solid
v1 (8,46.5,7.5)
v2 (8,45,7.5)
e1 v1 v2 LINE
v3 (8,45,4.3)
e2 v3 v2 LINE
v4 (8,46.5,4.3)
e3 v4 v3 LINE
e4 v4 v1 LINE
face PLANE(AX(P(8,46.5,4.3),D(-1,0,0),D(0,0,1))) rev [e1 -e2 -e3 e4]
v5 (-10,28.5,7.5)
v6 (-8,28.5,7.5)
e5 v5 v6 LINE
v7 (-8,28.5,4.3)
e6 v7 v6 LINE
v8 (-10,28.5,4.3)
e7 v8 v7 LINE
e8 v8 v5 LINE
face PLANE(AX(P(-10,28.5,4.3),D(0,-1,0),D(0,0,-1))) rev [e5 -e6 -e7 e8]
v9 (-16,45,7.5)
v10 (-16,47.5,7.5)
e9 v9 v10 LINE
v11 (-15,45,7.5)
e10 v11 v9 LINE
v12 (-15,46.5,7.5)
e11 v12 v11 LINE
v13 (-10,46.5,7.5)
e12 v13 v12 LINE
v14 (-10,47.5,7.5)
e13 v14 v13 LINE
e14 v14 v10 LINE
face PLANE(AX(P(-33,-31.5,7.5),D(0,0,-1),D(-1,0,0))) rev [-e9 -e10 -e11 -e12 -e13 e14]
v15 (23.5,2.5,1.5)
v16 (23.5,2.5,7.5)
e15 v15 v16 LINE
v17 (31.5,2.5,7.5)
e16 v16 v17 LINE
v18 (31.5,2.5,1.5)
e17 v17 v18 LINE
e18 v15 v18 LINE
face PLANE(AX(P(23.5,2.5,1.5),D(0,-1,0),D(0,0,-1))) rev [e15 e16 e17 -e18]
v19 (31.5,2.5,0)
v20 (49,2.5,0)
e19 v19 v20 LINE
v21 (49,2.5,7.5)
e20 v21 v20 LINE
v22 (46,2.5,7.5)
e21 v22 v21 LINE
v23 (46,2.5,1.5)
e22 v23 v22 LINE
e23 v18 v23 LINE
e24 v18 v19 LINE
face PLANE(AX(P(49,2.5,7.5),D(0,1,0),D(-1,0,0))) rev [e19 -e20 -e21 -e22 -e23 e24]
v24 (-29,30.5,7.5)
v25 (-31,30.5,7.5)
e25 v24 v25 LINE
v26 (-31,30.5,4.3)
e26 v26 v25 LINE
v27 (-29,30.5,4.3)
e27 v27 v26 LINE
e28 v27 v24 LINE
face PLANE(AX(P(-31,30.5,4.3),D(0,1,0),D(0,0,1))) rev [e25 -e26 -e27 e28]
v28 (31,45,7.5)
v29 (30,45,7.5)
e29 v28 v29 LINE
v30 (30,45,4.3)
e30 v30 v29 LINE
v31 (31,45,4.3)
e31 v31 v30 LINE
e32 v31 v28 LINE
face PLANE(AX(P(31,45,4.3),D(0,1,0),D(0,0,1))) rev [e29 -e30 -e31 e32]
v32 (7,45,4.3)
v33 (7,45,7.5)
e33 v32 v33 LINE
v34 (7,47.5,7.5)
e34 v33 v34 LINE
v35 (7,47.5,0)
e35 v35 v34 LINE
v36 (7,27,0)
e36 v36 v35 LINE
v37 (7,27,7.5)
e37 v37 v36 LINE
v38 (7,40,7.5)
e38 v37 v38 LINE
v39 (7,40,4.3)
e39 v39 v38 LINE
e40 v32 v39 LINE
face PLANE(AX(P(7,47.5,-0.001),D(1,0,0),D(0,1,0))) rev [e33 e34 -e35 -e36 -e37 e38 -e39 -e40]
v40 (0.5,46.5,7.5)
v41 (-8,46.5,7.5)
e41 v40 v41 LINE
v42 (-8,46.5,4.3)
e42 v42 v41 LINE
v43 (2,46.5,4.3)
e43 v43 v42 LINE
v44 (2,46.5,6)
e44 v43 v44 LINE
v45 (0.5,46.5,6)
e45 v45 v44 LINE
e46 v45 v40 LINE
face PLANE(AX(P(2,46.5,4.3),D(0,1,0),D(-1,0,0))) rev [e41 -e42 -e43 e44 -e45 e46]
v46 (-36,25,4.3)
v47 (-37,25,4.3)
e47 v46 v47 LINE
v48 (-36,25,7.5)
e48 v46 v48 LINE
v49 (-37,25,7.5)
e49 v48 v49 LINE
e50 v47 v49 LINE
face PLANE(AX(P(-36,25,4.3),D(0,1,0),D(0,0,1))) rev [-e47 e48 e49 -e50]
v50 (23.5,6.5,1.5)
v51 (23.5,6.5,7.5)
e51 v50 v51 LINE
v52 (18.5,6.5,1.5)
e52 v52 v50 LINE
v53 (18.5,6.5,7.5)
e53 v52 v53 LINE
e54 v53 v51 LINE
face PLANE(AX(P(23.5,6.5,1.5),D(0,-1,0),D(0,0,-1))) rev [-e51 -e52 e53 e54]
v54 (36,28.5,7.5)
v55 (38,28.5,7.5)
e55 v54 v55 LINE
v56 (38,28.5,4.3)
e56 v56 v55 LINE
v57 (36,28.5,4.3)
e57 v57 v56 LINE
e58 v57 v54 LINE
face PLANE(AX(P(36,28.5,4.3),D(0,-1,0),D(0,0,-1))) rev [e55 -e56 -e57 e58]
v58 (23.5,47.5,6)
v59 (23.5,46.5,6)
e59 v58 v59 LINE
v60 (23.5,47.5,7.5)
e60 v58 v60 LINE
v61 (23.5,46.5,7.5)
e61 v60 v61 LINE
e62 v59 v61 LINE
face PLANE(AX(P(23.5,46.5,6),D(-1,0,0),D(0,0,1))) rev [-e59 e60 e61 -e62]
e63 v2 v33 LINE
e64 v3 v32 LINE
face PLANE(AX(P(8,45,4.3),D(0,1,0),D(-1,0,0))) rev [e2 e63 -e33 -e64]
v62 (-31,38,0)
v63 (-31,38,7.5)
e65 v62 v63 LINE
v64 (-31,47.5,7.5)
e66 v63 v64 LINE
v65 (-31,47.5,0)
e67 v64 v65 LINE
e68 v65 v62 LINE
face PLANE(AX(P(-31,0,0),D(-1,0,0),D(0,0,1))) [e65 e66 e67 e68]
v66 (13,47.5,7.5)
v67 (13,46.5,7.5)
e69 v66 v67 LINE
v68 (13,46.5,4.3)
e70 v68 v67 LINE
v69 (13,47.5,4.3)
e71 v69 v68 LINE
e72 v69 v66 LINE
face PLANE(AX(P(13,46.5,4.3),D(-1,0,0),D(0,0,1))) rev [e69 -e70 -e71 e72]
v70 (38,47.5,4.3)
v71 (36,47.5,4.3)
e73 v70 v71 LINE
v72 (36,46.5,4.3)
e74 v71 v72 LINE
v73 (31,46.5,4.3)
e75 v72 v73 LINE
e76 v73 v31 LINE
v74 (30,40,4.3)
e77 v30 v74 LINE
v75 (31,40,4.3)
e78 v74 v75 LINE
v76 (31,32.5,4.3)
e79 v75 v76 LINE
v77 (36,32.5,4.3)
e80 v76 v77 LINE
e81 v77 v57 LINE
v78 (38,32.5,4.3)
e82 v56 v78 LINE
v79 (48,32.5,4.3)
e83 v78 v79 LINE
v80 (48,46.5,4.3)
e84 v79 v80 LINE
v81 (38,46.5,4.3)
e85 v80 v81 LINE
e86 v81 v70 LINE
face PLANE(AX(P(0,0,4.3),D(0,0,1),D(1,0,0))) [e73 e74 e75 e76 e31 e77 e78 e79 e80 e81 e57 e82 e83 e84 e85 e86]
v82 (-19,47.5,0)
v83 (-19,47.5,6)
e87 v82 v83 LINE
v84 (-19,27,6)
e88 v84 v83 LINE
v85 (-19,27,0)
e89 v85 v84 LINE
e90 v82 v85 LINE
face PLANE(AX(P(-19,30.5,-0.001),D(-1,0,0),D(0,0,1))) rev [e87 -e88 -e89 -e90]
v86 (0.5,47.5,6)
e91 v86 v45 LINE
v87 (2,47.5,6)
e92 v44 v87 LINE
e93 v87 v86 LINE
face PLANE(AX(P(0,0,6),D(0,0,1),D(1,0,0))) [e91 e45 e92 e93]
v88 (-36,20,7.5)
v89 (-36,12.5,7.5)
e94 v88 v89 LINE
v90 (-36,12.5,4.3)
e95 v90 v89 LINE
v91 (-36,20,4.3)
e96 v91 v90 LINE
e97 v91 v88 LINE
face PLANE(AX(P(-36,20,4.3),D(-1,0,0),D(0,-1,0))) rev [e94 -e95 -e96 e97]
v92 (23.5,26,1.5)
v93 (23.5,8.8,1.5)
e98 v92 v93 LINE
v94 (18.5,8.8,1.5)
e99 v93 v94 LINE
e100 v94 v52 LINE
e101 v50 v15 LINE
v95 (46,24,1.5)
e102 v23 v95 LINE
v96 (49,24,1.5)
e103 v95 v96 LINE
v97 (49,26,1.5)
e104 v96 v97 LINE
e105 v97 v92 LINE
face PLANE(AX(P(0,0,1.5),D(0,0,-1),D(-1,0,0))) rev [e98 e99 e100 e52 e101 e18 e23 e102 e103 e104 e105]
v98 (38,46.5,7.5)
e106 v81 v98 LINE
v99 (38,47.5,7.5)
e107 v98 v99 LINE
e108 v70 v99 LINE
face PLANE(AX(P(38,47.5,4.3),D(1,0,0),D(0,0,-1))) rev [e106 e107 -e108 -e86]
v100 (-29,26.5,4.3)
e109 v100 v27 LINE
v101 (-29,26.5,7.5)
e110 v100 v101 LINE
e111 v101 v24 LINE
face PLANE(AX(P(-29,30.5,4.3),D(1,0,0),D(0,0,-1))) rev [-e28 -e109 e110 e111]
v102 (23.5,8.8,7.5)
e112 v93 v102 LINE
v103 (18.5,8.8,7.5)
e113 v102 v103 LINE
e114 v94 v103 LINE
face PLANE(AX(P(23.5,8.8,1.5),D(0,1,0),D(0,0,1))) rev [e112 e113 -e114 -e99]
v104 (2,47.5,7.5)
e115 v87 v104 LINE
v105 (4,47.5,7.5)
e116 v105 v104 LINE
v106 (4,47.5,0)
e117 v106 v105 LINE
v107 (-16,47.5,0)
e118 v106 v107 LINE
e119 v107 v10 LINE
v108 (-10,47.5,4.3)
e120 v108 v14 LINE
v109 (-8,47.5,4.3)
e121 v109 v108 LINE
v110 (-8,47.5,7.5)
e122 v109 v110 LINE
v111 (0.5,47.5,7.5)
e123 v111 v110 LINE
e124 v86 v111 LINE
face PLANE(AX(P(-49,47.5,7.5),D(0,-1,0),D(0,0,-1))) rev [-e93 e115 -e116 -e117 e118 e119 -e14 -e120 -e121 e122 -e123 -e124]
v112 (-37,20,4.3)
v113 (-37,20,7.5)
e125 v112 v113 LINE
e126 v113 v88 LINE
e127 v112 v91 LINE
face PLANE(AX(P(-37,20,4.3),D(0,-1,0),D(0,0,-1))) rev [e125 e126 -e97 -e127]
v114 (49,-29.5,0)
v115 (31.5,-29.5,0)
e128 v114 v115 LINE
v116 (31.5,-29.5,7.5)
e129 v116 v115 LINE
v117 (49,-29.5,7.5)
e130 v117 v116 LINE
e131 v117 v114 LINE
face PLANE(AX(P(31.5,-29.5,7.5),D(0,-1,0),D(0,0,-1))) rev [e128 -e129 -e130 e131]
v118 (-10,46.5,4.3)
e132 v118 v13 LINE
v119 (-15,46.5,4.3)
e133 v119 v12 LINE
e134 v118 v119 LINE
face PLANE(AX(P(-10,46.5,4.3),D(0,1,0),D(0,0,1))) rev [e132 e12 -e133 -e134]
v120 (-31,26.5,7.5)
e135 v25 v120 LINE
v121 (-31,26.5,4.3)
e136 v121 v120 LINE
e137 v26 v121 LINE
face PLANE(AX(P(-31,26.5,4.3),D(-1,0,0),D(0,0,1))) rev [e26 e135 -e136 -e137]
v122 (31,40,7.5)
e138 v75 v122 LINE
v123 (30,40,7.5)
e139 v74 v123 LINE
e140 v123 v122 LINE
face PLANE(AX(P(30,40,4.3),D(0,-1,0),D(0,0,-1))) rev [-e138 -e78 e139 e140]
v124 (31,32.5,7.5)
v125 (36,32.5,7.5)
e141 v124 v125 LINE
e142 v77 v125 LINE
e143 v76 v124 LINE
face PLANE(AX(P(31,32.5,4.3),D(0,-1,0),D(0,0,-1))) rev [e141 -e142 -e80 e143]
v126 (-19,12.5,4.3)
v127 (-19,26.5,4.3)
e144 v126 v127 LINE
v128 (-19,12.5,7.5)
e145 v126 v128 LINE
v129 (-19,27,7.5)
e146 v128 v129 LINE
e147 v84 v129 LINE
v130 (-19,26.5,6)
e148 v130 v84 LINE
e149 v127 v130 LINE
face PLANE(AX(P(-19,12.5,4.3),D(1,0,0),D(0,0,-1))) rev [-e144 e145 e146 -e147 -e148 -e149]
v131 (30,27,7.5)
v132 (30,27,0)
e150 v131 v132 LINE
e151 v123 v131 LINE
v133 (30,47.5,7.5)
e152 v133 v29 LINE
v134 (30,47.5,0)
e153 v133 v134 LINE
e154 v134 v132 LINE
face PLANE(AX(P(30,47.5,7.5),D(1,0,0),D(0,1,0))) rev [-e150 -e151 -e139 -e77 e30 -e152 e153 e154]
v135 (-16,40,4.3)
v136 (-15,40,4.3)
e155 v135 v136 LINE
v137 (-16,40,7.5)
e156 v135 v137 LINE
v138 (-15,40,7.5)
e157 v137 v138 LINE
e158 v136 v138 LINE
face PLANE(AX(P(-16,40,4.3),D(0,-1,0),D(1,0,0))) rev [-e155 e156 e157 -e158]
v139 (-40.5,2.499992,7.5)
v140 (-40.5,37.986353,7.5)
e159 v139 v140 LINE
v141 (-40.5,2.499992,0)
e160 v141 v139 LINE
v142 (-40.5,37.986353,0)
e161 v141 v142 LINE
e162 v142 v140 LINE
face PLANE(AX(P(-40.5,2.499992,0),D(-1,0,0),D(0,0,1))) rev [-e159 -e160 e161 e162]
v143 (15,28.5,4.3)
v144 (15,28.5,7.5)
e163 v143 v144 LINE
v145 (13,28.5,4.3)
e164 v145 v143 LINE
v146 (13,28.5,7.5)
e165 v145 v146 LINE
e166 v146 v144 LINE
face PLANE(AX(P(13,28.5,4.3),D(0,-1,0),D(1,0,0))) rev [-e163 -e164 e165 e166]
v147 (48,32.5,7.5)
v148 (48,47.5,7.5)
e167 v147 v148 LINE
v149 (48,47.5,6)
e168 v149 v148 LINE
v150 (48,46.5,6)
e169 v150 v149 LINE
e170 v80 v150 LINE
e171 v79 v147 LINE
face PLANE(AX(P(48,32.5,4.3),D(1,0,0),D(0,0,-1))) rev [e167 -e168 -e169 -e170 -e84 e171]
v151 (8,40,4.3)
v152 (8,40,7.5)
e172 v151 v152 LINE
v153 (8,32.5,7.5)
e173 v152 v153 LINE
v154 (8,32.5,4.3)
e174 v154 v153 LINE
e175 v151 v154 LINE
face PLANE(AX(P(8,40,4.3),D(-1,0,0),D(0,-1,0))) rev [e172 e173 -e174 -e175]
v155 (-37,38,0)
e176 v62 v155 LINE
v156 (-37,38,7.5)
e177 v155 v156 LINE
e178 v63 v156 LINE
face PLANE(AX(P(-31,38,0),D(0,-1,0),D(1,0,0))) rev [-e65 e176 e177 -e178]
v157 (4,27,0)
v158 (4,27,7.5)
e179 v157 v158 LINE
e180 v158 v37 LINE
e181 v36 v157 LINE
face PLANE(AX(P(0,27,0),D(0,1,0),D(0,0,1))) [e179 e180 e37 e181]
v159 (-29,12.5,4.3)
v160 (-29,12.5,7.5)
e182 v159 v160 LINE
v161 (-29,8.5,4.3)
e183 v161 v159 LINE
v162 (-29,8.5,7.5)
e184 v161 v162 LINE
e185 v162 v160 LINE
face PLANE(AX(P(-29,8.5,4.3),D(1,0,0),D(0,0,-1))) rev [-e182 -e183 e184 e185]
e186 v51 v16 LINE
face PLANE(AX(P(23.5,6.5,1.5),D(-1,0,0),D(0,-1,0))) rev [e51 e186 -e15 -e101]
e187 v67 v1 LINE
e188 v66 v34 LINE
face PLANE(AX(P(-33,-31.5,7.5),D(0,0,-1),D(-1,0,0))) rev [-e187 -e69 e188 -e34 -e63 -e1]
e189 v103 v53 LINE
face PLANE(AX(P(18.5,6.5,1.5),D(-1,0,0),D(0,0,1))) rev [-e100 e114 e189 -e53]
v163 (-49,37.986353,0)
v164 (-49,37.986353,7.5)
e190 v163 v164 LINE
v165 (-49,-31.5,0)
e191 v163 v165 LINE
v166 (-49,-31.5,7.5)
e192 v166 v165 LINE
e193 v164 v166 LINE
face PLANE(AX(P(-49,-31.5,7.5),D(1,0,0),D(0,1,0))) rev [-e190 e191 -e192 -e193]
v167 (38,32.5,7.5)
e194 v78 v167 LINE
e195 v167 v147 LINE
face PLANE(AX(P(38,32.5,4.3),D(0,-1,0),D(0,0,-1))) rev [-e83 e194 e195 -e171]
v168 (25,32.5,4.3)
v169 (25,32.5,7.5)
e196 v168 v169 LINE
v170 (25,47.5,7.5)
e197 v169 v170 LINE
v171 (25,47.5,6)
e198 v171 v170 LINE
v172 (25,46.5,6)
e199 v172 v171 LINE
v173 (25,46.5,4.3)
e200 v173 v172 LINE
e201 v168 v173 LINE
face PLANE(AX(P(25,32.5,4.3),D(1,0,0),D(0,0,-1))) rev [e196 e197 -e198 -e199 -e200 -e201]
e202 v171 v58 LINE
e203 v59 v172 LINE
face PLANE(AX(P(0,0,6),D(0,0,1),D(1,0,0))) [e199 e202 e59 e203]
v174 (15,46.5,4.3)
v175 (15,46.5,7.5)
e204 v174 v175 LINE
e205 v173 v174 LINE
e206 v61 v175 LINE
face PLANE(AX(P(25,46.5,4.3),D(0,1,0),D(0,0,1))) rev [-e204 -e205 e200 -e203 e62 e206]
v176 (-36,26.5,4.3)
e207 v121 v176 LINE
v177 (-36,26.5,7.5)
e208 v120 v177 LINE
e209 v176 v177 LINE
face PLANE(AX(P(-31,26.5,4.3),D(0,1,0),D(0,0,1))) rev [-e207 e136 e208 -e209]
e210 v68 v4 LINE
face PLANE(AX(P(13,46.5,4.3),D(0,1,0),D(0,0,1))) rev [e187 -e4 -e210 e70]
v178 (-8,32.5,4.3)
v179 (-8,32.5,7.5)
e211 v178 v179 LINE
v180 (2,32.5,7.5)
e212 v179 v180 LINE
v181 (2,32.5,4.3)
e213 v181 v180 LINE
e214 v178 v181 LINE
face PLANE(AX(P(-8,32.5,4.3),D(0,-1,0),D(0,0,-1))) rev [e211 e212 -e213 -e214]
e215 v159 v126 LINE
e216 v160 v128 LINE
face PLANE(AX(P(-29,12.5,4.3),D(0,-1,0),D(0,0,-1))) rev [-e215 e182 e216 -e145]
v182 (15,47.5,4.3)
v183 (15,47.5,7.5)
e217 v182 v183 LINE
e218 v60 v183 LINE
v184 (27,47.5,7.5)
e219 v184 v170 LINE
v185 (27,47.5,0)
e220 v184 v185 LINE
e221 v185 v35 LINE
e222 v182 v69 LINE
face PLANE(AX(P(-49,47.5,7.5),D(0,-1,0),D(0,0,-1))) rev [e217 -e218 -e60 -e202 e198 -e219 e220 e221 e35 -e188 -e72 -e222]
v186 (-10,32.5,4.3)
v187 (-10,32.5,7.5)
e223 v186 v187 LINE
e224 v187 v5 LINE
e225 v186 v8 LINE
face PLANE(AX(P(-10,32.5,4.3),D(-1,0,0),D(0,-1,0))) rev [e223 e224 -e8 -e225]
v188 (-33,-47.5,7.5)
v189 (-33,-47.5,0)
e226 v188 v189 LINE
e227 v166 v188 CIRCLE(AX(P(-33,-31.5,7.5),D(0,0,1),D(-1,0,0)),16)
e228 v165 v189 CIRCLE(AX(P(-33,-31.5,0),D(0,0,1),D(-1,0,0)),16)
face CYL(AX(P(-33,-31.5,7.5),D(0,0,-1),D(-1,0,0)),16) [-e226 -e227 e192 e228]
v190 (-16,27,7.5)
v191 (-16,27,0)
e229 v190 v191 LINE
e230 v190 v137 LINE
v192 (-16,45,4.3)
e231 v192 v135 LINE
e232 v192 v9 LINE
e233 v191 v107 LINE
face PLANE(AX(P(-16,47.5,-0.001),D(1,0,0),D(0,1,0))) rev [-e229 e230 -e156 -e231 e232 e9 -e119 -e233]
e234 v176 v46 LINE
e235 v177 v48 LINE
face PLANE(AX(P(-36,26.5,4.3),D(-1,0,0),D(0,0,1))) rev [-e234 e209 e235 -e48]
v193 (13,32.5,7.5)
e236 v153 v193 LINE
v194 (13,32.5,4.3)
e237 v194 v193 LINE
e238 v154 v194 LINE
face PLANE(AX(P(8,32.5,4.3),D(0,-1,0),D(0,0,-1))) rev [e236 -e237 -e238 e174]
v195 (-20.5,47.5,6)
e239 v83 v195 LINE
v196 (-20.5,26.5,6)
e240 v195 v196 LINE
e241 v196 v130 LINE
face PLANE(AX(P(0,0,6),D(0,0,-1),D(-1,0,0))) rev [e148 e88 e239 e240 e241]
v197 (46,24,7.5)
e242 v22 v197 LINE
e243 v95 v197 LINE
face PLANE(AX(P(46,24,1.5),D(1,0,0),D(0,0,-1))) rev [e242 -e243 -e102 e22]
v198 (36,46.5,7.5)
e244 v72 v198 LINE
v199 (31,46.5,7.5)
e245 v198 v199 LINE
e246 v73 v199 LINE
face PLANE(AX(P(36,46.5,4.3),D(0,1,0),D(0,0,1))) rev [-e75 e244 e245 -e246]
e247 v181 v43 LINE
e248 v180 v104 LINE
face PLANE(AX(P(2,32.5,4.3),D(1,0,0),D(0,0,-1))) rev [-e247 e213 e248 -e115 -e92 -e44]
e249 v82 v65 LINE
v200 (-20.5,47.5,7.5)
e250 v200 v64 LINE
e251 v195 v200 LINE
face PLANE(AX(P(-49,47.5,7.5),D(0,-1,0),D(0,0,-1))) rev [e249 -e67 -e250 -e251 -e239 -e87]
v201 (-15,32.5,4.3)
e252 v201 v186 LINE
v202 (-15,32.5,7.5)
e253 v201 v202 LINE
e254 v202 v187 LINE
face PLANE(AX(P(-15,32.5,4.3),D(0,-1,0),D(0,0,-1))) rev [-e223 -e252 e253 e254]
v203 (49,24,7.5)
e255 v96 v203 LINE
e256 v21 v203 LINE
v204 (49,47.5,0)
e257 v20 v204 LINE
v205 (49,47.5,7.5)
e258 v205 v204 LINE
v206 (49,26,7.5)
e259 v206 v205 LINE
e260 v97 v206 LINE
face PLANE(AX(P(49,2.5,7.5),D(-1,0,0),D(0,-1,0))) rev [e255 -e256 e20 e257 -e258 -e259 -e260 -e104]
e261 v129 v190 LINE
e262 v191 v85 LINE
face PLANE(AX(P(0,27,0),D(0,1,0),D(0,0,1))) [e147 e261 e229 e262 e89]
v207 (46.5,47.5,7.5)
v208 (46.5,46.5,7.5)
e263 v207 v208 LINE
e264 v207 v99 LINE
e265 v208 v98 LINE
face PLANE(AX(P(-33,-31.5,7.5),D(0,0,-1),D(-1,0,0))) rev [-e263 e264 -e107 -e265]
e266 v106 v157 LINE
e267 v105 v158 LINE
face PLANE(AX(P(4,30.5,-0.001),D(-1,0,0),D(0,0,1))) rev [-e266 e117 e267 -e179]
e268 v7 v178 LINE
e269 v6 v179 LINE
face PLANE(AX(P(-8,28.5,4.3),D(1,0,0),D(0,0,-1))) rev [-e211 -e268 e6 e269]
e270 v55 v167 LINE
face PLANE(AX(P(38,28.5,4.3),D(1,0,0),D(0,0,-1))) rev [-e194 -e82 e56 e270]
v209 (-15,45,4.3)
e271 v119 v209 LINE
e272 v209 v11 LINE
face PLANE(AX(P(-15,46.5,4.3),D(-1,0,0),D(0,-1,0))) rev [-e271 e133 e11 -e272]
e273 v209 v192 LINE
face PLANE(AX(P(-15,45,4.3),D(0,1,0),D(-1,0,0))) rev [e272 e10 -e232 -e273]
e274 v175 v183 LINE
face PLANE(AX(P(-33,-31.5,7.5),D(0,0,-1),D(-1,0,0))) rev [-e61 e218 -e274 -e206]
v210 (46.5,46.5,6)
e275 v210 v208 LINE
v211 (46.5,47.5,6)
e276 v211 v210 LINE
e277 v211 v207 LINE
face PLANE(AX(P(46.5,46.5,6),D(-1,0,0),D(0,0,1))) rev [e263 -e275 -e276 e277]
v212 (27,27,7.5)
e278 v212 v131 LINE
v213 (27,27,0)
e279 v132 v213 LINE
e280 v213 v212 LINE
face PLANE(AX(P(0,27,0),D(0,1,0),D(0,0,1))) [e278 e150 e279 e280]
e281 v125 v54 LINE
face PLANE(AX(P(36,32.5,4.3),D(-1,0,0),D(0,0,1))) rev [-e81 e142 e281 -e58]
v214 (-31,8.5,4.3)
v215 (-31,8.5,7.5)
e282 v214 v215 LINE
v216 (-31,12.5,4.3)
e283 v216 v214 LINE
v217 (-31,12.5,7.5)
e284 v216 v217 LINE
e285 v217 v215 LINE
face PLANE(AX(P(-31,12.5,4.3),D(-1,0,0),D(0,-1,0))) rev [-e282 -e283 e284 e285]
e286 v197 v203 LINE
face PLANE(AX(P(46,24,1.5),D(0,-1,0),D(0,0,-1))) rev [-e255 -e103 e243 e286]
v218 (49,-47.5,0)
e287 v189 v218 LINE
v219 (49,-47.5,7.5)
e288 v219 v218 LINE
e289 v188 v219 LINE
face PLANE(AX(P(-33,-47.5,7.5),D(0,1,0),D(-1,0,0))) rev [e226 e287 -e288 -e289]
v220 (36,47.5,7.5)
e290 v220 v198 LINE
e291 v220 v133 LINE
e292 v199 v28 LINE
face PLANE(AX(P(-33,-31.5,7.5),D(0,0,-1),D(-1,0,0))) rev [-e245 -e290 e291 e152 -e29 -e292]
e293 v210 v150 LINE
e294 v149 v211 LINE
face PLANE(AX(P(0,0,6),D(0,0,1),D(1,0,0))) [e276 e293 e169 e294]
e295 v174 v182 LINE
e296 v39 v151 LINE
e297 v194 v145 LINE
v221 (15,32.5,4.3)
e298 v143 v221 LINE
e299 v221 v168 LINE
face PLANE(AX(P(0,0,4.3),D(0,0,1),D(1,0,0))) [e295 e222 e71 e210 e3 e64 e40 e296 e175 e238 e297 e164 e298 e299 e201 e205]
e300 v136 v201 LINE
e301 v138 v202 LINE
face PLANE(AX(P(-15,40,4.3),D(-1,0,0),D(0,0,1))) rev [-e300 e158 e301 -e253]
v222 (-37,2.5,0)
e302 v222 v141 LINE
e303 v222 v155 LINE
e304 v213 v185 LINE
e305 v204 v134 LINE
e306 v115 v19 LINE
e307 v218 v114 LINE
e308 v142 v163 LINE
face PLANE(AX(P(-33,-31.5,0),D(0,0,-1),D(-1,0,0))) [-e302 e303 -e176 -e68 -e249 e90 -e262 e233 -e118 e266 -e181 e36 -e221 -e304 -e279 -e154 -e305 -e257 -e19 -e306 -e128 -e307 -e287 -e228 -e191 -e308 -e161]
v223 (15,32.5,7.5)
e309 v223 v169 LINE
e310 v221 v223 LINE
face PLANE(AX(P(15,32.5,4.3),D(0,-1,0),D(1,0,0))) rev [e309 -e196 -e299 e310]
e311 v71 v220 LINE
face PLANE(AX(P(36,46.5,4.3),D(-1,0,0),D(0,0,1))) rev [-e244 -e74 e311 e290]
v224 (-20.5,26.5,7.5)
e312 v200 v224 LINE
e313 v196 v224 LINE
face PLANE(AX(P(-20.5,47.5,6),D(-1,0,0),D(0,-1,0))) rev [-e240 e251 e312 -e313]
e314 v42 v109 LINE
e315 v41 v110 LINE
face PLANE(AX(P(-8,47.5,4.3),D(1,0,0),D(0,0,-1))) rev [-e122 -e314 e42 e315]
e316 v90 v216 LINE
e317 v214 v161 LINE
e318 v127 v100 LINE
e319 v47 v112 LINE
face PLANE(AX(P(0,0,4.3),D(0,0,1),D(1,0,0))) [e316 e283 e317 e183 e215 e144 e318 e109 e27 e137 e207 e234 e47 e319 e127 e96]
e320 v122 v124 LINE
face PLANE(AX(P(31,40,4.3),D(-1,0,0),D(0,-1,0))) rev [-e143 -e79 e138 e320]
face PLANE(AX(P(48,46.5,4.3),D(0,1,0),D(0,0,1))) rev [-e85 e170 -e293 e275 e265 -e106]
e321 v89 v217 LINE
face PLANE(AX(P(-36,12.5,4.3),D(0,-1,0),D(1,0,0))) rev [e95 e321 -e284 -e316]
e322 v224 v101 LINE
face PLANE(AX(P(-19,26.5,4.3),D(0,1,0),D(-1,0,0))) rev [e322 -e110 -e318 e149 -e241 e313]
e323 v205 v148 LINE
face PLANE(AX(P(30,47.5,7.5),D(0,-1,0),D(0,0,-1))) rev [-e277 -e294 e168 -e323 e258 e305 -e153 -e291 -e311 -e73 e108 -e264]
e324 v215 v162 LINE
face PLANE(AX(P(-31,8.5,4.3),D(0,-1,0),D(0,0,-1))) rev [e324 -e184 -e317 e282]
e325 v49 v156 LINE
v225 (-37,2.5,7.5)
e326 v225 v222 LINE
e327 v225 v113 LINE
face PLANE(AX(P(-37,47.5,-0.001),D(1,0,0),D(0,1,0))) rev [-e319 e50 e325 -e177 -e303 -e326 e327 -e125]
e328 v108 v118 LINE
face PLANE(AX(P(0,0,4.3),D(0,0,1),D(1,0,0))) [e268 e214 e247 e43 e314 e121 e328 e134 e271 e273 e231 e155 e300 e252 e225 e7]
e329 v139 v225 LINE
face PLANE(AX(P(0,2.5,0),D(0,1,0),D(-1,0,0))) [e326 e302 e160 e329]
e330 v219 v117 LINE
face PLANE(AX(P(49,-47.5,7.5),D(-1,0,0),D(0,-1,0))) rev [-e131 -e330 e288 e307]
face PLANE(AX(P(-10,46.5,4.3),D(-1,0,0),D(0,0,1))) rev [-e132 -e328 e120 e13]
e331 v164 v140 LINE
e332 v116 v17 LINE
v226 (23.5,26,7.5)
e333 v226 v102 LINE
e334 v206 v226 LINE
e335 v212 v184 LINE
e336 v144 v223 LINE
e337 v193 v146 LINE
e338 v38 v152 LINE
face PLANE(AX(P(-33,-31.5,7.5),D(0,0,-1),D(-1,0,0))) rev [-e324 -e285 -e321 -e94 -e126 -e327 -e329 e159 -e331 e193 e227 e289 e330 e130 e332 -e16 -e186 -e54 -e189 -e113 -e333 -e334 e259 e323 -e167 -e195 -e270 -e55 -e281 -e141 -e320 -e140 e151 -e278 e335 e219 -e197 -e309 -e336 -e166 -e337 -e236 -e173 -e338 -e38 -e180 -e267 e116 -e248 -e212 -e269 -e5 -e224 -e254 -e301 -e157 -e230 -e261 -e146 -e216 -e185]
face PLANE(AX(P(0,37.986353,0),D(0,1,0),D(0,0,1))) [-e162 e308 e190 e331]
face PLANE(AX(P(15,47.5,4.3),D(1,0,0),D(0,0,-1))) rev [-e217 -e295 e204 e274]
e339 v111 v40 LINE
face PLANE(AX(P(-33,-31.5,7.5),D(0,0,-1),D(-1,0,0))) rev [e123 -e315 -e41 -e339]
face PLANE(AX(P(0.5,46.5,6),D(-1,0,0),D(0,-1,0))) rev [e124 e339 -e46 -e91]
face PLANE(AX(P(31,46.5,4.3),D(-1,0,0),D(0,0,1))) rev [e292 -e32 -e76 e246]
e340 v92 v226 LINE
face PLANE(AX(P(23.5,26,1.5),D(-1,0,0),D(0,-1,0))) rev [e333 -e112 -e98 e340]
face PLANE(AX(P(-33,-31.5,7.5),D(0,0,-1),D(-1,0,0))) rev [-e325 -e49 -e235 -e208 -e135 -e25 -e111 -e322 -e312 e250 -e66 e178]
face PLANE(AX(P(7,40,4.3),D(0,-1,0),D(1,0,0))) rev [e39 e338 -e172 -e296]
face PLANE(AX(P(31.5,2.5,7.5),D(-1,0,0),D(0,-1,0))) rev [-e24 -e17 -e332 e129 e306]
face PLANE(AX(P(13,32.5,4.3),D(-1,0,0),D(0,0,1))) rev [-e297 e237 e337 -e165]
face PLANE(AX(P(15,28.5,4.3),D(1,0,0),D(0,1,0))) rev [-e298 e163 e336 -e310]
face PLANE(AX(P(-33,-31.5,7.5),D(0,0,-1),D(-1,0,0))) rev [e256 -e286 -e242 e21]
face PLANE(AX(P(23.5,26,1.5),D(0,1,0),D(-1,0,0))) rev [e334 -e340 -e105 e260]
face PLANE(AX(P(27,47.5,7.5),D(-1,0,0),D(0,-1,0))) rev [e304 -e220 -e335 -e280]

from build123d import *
from OCP.BRepAlgoAPI import BRepAlgoAPI_Cut
from OCP.TopTools import TopTools_ListOfShape
from build123d.topology import SkipClean

# Parameters (mm, degrees)
BOSS_EXTRUDE1_DEPTH = 7.5
CUT_EXTRUDE1_DEPTH  = 3.2
CUT_EXTRUDE4_REACH  = 70.655
SKETCH5_W           = 3
SKETCH5_H           = 17
CUT_EXTRUDE5_REACH  = 70.655
SKETCH8_W           = 12
SKETCH8_H           = 37
CUT_EXTRUDE6_DEPTH  = 3.2
SKETCH10_W          = 10
SKETCH10_H          = 7.5
BOSS_EXTRUDE2_DEPTH = 27.486353186
SKETCH11_W          = 3
SKETCH11_H          = 7.5
CUT_EXTRUDE7_DEPTH  = 3.5
SKETCH12_W          = 2
SKETCH12_H          = 7.5
CUT_EXTRUDE8_DEPTH  = 4
SKETCH13_W          = 2
SKETCH13_H          = 7.5
CUT_EXTRUDE9_DEPTH  = 4
SKETCH14_W          = 7.5
SKETCH14_H          = 9.5
CUT_EXTRUDE10_DEPTH = 6
SKETCH15_W          = 1.5
SKETCH15_H          = 21
SKETCH15_H_2        = 1
CUT_EXTRUDE11_DEPTH = 1.5
SKETCH16_W          = 1.5
SKETCH16_H          = 7.5
CUT_EXTRUDE12_DEPTH = 35.486360958
CUT_EXTRUDE13_DEPTH = 6


with BuildPart() as part:
    # Sketch1 → Boss-Extrude1 (new body)
    with BuildSketch(Plane.XY):
        with BuildLine():
            Line((-33, -47.5), (49, -47.5))
            Line((49, -47.5), (49, -29.5))
            Line((49, -29.5), (31.5, -29.5))
            Line((31.5, -29.5), (31.5, 2.5))
            Line((31.5, 2.5), (49, 2.5))
            Line((49, 2.5), (49, 47.5))
            Line((49, 47.5), (30, 47.5))
            Line((30, 47.5), (30, 30.5))
            Line((30, 30.5), (27, 30.5))
            Line((27, 30.5), (27, 47.5))
            Line((27, 47.5), (-49, 47.5))
            Line((-49, 47.5), (-49, -31.5))
            ThreePointArc((-49, -31.5), (-44.313708499, -42.813708499), (-33, -47.5))
        make_face()
    extrude(amount=BOSS_EXTRUDE1_DEPTH)

    # Sketch2 → Cut-Extrude1 (cut)
    with BuildSketch(Plane.XY.offset(7.5)):
        Polygon((30, 40), (31, 40), (31, 32.5), (36, 32.5), (36, 28.5), (38, 28.5), (38, 32.5), (48, 32.5), (48, 46.5), (38, 46.5), (38, 47.5), (36, 47.5), (36, 46.5), (31, 46.5), (31, 45), (30, 45), align=None)
        Polygon((-16, 40), (-15, 40), (-15, 32.5), (-10, 32.5), (-10, 28.5), (-8, 28.5), (-8, 32.5), (2, 32.5), (2, 46.5), (-8, 46.5), (-8, 47.5), (-10, 47.5), (-10, 46.5), (-15, 46.5), (-15, 45), (-16, 45), align=None)
        Polygon((7, 40), (8, 40), (8, 32.5), (13, 32.5), (13, 28.5), (15, 28.5), (15, 32.5), (25, 32.5), (25, 46.5), (15, 46.5), (15, 47.5), (13, 47.5), (13, 46.5), (8, 46.5), (8, 45), (7, 45), align=None)
    extrude(amount=-CUT_EXTRUDE1_DEPTH, mode=Mode.SUBTRACT)

    # Sketch5 → Cut-Extrude4 (cut, up to next)
    with BuildSketch(Plane.XY.offset(7.5), mode=Mode.PRIVATE) as cut_extrude4_sk1:
        with Locations((5.5, 39)):
            Rectangle(SKETCH5_W, SKETCH5_H)
    cut_extrude4_tool1 = extrude(cut_extrude4_sk1.sketch, amount=-CUT_EXTRUDE4_REACH, mode=Mode.PRIVATE) & part.part
    # Sketch5 → Cut-Extrude4 (cut, up to next)
    with BuildSketch(Plane.XY.offset(7.5), mode=Mode.PRIVATE) as cut_extrude4_sk2:
        with Locations((-17.5, 39)):
            Rectangle(SKETCH5_W, SKETCH5_H)
    cut_extrude4_tool2 = extrude(cut_extrude4_sk2.sketch, amount=-CUT_EXTRUDE4_REACH, mode=Mode.PRIVATE) & part.part
    add(cut_extrude4_tool1.solids().sort_by_distance((5.5, 39, 7.5))[0], mode=Mode.SUBTRACT)
    add(cut_extrude4_tool2.solids().sort_by_distance((-17.5, 39, 7.5))[0], mode=Mode.SUBTRACT)

    # Sketch8 → Cut-Extrude5 (cut, up to next)
    with BuildSketch(Plane.XY.offset(7.5), mode=Mode.PRIVATE) as cut_extrude5_sk1:
        with Locations((-43, 29)):
            Rectangle(SKETCH8_W, SKETCH8_H)
    cut_extrude5_tool1 = extrude(cut_extrude5_sk1.sketch, amount=-CUT_EXTRUDE5_REACH, mode=Mode.PRIVATE) & part.part
    add(cut_extrude5_tool1.solids().sort_by_distance((-43, 29, 7.5))[0], mode=Mode.SUBTRACT)

    # Sketch9 → Cut-Extrude6 (cut)
    with BuildSketch(Plane.XY.offset(7.5)):
        Polygon((-37, 20), (-36, 20), (-36, 12.5), (-31, 12.5), (-31, 8.5), (-29, 8.5), (-29, 12.5), (-19, 12.5), (-19, 26.5), (-29, 26.5), (-29, 30.5), (-31, 30.5), (-31, 26.5), (-36, 26.5), (-36, 25), (-37, 25), align=None)
    extrude(amount=-CUT_EXTRUDE6_DEPTH, mode=Mode.SUBTRACT)

    # Sketch10 → Boss-Extrude2 (add)
    with BuildSketch(Plane(origin=(0, 10.5, 0), x_dir=(1, 0, 0), z_dir=(0, 1, 0))):
        with Locations((-44, -3.75)):
            Rectangle(SKETCH10_W, SKETCH10_H)
    extrude(amount=BOSS_EXTRUDE2_DEPTH)

    # Sketch11 → Cut-Extrude7 (cut)
    with BuildSketch(Plane(origin=(0, 30.5, 0), x_dir=(1, 0, 0), z_dir=(0, 1, 0))):
        with Locations((-17.5, -3.75)):
            Rectangle(SKETCH11_W, SKETCH11_H)
        with Locations((5.5, -3.75)):
            Rectangle(SKETCH11_W, SKETCH11_H)
        with Locations((28.5, -3.75)):
            Rectangle(SKETCH11_W, SKETCH11_H)
    extrude(amount=-CUT_EXTRUDE7_DEPTH, mode=Mode.SUBTRACT)

    # Sketch12 → Cut-Extrude8 (cut)
    with BuildSketch(Plane(origin=(0, 10.5, 0), x_dir=(1, 0, 0), z_dir=(0, 1, 0))):
        with Locations((-38, -3.75)):
            Rectangle(SKETCH12_W, SKETCH12_H)
    extrude(amount=-CUT_EXTRUDE8_DEPTH, mode=Mode.SUBTRACT)

    # Sketch13 → Cut-Extrude9 (cut)
    with BuildSketch(Plane(origin=(0, 6.5, 0), x_dir=(1, 0, 0), z_dir=(0, 1, 0))):
        with Locations((-38, -3.75)):
            Rectangle(SKETCH13_W, SKETCH13_H)
    extrude(amount=-CUT_EXTRUDE9_DEPTH, mode=Mode.SUBTRACT)

    # Sketch14 → Cut-Extrude10 (cut)
    with BuildSketch(Plane.ZY.offset(37)):
        with Locations((3.75, 42.75)):
            Rectangle(SKETCH14_W, SKETCH14_H)
    extrude(amount=-CUT_EXTRUDE10_DEPTH, mode=Mode.SUBTRACT)

    # Sketch15 → Cut-Extrude11 (cut)
    with BuildSketch(Plane.XY.offset(7.5)):
        with Locations((-19.75, 37)):
            Rectangle(SKETCH15_W, SKETCH15_H)
        with Locations((1.25, 47)):
            Rectangle(SKETCH15_W, SKETCH15_H_2)
        with Locations((24.25, 47)):
            Rectangle(SKETCH15_W, SKETCH15_H_2)
        with Locations((47.25, 47)):
            Rectangle(SKETCH15_W, SKETCH15_H_2)
    extrude(amount=-CUT_EXTRUDE11_DEPTH, mode=Mode.SUBTRACT)


with BuildPart() as cut_extrude12_tool:
    # Sketch16 → Cut-Extrude12 (new body)
    with BuildSketch(Plane(origin=(0, 37.986353186, 0), x_dir=(1, 0, 0), z_dir=(0, 1, 0))):
        with Locations((-39.75, -3.75)):
            Rectangle(SKETCH16_W, SKETCH16_H)
    extrude(amount=-CUT_EXTRUDE12_DEPTH)


with BuildPart() as part_1:
    add(part.part)

    # Cut-Extrude12: cut by cut_extrude12_tool, with a tolerance
    cut_extrude12_stock = TopTools_ListOfShape()
    cut_extrude12_stock.Append(part_1.part.wrapped)
    cut_extrude12_tools = TopTools_ListOfShape()
    cut_extrude12_tools.Append(cut_extrude12_tool.part.wrapped)
    cut_extrude12_cut = BRepAlgoAPI_Cut()
    cut_extrude12_cut.SetArguments(cut_extrude12_stock)
    cut_extrude12_cut.SetTools(cut_extrude12_tools)
    cut_extrude12_cut.SetFuzzyValue(0.00001)
    cut_extrude12_cut.Build()
    add(Compound.cast(cut_extrude12_cut.Shape()).solids(), mode=Mode.REPLACE)

    # Sketch18 → Cut-Extrude13 (cut)
    with SkipClean():  # the faces are left unmerged after this step: merging them gives an invalid solid
        with BuildSketch(Plane.XY.offset(7.5)):
            Polygon((23.5, 6.5), (23.5, 2.5), (46, 2.5), (46, 24), (49, 24), (49, 26), (46, 26), (23.5, 26), (23.5, 8.8), (18.5, 8.8), (18.5, 6.5), align=None)
        extrude(amount=-CUT_EXTRUDE13_DEPTH, mode=Mode.SUBTRACT)


solid = part_1.part
